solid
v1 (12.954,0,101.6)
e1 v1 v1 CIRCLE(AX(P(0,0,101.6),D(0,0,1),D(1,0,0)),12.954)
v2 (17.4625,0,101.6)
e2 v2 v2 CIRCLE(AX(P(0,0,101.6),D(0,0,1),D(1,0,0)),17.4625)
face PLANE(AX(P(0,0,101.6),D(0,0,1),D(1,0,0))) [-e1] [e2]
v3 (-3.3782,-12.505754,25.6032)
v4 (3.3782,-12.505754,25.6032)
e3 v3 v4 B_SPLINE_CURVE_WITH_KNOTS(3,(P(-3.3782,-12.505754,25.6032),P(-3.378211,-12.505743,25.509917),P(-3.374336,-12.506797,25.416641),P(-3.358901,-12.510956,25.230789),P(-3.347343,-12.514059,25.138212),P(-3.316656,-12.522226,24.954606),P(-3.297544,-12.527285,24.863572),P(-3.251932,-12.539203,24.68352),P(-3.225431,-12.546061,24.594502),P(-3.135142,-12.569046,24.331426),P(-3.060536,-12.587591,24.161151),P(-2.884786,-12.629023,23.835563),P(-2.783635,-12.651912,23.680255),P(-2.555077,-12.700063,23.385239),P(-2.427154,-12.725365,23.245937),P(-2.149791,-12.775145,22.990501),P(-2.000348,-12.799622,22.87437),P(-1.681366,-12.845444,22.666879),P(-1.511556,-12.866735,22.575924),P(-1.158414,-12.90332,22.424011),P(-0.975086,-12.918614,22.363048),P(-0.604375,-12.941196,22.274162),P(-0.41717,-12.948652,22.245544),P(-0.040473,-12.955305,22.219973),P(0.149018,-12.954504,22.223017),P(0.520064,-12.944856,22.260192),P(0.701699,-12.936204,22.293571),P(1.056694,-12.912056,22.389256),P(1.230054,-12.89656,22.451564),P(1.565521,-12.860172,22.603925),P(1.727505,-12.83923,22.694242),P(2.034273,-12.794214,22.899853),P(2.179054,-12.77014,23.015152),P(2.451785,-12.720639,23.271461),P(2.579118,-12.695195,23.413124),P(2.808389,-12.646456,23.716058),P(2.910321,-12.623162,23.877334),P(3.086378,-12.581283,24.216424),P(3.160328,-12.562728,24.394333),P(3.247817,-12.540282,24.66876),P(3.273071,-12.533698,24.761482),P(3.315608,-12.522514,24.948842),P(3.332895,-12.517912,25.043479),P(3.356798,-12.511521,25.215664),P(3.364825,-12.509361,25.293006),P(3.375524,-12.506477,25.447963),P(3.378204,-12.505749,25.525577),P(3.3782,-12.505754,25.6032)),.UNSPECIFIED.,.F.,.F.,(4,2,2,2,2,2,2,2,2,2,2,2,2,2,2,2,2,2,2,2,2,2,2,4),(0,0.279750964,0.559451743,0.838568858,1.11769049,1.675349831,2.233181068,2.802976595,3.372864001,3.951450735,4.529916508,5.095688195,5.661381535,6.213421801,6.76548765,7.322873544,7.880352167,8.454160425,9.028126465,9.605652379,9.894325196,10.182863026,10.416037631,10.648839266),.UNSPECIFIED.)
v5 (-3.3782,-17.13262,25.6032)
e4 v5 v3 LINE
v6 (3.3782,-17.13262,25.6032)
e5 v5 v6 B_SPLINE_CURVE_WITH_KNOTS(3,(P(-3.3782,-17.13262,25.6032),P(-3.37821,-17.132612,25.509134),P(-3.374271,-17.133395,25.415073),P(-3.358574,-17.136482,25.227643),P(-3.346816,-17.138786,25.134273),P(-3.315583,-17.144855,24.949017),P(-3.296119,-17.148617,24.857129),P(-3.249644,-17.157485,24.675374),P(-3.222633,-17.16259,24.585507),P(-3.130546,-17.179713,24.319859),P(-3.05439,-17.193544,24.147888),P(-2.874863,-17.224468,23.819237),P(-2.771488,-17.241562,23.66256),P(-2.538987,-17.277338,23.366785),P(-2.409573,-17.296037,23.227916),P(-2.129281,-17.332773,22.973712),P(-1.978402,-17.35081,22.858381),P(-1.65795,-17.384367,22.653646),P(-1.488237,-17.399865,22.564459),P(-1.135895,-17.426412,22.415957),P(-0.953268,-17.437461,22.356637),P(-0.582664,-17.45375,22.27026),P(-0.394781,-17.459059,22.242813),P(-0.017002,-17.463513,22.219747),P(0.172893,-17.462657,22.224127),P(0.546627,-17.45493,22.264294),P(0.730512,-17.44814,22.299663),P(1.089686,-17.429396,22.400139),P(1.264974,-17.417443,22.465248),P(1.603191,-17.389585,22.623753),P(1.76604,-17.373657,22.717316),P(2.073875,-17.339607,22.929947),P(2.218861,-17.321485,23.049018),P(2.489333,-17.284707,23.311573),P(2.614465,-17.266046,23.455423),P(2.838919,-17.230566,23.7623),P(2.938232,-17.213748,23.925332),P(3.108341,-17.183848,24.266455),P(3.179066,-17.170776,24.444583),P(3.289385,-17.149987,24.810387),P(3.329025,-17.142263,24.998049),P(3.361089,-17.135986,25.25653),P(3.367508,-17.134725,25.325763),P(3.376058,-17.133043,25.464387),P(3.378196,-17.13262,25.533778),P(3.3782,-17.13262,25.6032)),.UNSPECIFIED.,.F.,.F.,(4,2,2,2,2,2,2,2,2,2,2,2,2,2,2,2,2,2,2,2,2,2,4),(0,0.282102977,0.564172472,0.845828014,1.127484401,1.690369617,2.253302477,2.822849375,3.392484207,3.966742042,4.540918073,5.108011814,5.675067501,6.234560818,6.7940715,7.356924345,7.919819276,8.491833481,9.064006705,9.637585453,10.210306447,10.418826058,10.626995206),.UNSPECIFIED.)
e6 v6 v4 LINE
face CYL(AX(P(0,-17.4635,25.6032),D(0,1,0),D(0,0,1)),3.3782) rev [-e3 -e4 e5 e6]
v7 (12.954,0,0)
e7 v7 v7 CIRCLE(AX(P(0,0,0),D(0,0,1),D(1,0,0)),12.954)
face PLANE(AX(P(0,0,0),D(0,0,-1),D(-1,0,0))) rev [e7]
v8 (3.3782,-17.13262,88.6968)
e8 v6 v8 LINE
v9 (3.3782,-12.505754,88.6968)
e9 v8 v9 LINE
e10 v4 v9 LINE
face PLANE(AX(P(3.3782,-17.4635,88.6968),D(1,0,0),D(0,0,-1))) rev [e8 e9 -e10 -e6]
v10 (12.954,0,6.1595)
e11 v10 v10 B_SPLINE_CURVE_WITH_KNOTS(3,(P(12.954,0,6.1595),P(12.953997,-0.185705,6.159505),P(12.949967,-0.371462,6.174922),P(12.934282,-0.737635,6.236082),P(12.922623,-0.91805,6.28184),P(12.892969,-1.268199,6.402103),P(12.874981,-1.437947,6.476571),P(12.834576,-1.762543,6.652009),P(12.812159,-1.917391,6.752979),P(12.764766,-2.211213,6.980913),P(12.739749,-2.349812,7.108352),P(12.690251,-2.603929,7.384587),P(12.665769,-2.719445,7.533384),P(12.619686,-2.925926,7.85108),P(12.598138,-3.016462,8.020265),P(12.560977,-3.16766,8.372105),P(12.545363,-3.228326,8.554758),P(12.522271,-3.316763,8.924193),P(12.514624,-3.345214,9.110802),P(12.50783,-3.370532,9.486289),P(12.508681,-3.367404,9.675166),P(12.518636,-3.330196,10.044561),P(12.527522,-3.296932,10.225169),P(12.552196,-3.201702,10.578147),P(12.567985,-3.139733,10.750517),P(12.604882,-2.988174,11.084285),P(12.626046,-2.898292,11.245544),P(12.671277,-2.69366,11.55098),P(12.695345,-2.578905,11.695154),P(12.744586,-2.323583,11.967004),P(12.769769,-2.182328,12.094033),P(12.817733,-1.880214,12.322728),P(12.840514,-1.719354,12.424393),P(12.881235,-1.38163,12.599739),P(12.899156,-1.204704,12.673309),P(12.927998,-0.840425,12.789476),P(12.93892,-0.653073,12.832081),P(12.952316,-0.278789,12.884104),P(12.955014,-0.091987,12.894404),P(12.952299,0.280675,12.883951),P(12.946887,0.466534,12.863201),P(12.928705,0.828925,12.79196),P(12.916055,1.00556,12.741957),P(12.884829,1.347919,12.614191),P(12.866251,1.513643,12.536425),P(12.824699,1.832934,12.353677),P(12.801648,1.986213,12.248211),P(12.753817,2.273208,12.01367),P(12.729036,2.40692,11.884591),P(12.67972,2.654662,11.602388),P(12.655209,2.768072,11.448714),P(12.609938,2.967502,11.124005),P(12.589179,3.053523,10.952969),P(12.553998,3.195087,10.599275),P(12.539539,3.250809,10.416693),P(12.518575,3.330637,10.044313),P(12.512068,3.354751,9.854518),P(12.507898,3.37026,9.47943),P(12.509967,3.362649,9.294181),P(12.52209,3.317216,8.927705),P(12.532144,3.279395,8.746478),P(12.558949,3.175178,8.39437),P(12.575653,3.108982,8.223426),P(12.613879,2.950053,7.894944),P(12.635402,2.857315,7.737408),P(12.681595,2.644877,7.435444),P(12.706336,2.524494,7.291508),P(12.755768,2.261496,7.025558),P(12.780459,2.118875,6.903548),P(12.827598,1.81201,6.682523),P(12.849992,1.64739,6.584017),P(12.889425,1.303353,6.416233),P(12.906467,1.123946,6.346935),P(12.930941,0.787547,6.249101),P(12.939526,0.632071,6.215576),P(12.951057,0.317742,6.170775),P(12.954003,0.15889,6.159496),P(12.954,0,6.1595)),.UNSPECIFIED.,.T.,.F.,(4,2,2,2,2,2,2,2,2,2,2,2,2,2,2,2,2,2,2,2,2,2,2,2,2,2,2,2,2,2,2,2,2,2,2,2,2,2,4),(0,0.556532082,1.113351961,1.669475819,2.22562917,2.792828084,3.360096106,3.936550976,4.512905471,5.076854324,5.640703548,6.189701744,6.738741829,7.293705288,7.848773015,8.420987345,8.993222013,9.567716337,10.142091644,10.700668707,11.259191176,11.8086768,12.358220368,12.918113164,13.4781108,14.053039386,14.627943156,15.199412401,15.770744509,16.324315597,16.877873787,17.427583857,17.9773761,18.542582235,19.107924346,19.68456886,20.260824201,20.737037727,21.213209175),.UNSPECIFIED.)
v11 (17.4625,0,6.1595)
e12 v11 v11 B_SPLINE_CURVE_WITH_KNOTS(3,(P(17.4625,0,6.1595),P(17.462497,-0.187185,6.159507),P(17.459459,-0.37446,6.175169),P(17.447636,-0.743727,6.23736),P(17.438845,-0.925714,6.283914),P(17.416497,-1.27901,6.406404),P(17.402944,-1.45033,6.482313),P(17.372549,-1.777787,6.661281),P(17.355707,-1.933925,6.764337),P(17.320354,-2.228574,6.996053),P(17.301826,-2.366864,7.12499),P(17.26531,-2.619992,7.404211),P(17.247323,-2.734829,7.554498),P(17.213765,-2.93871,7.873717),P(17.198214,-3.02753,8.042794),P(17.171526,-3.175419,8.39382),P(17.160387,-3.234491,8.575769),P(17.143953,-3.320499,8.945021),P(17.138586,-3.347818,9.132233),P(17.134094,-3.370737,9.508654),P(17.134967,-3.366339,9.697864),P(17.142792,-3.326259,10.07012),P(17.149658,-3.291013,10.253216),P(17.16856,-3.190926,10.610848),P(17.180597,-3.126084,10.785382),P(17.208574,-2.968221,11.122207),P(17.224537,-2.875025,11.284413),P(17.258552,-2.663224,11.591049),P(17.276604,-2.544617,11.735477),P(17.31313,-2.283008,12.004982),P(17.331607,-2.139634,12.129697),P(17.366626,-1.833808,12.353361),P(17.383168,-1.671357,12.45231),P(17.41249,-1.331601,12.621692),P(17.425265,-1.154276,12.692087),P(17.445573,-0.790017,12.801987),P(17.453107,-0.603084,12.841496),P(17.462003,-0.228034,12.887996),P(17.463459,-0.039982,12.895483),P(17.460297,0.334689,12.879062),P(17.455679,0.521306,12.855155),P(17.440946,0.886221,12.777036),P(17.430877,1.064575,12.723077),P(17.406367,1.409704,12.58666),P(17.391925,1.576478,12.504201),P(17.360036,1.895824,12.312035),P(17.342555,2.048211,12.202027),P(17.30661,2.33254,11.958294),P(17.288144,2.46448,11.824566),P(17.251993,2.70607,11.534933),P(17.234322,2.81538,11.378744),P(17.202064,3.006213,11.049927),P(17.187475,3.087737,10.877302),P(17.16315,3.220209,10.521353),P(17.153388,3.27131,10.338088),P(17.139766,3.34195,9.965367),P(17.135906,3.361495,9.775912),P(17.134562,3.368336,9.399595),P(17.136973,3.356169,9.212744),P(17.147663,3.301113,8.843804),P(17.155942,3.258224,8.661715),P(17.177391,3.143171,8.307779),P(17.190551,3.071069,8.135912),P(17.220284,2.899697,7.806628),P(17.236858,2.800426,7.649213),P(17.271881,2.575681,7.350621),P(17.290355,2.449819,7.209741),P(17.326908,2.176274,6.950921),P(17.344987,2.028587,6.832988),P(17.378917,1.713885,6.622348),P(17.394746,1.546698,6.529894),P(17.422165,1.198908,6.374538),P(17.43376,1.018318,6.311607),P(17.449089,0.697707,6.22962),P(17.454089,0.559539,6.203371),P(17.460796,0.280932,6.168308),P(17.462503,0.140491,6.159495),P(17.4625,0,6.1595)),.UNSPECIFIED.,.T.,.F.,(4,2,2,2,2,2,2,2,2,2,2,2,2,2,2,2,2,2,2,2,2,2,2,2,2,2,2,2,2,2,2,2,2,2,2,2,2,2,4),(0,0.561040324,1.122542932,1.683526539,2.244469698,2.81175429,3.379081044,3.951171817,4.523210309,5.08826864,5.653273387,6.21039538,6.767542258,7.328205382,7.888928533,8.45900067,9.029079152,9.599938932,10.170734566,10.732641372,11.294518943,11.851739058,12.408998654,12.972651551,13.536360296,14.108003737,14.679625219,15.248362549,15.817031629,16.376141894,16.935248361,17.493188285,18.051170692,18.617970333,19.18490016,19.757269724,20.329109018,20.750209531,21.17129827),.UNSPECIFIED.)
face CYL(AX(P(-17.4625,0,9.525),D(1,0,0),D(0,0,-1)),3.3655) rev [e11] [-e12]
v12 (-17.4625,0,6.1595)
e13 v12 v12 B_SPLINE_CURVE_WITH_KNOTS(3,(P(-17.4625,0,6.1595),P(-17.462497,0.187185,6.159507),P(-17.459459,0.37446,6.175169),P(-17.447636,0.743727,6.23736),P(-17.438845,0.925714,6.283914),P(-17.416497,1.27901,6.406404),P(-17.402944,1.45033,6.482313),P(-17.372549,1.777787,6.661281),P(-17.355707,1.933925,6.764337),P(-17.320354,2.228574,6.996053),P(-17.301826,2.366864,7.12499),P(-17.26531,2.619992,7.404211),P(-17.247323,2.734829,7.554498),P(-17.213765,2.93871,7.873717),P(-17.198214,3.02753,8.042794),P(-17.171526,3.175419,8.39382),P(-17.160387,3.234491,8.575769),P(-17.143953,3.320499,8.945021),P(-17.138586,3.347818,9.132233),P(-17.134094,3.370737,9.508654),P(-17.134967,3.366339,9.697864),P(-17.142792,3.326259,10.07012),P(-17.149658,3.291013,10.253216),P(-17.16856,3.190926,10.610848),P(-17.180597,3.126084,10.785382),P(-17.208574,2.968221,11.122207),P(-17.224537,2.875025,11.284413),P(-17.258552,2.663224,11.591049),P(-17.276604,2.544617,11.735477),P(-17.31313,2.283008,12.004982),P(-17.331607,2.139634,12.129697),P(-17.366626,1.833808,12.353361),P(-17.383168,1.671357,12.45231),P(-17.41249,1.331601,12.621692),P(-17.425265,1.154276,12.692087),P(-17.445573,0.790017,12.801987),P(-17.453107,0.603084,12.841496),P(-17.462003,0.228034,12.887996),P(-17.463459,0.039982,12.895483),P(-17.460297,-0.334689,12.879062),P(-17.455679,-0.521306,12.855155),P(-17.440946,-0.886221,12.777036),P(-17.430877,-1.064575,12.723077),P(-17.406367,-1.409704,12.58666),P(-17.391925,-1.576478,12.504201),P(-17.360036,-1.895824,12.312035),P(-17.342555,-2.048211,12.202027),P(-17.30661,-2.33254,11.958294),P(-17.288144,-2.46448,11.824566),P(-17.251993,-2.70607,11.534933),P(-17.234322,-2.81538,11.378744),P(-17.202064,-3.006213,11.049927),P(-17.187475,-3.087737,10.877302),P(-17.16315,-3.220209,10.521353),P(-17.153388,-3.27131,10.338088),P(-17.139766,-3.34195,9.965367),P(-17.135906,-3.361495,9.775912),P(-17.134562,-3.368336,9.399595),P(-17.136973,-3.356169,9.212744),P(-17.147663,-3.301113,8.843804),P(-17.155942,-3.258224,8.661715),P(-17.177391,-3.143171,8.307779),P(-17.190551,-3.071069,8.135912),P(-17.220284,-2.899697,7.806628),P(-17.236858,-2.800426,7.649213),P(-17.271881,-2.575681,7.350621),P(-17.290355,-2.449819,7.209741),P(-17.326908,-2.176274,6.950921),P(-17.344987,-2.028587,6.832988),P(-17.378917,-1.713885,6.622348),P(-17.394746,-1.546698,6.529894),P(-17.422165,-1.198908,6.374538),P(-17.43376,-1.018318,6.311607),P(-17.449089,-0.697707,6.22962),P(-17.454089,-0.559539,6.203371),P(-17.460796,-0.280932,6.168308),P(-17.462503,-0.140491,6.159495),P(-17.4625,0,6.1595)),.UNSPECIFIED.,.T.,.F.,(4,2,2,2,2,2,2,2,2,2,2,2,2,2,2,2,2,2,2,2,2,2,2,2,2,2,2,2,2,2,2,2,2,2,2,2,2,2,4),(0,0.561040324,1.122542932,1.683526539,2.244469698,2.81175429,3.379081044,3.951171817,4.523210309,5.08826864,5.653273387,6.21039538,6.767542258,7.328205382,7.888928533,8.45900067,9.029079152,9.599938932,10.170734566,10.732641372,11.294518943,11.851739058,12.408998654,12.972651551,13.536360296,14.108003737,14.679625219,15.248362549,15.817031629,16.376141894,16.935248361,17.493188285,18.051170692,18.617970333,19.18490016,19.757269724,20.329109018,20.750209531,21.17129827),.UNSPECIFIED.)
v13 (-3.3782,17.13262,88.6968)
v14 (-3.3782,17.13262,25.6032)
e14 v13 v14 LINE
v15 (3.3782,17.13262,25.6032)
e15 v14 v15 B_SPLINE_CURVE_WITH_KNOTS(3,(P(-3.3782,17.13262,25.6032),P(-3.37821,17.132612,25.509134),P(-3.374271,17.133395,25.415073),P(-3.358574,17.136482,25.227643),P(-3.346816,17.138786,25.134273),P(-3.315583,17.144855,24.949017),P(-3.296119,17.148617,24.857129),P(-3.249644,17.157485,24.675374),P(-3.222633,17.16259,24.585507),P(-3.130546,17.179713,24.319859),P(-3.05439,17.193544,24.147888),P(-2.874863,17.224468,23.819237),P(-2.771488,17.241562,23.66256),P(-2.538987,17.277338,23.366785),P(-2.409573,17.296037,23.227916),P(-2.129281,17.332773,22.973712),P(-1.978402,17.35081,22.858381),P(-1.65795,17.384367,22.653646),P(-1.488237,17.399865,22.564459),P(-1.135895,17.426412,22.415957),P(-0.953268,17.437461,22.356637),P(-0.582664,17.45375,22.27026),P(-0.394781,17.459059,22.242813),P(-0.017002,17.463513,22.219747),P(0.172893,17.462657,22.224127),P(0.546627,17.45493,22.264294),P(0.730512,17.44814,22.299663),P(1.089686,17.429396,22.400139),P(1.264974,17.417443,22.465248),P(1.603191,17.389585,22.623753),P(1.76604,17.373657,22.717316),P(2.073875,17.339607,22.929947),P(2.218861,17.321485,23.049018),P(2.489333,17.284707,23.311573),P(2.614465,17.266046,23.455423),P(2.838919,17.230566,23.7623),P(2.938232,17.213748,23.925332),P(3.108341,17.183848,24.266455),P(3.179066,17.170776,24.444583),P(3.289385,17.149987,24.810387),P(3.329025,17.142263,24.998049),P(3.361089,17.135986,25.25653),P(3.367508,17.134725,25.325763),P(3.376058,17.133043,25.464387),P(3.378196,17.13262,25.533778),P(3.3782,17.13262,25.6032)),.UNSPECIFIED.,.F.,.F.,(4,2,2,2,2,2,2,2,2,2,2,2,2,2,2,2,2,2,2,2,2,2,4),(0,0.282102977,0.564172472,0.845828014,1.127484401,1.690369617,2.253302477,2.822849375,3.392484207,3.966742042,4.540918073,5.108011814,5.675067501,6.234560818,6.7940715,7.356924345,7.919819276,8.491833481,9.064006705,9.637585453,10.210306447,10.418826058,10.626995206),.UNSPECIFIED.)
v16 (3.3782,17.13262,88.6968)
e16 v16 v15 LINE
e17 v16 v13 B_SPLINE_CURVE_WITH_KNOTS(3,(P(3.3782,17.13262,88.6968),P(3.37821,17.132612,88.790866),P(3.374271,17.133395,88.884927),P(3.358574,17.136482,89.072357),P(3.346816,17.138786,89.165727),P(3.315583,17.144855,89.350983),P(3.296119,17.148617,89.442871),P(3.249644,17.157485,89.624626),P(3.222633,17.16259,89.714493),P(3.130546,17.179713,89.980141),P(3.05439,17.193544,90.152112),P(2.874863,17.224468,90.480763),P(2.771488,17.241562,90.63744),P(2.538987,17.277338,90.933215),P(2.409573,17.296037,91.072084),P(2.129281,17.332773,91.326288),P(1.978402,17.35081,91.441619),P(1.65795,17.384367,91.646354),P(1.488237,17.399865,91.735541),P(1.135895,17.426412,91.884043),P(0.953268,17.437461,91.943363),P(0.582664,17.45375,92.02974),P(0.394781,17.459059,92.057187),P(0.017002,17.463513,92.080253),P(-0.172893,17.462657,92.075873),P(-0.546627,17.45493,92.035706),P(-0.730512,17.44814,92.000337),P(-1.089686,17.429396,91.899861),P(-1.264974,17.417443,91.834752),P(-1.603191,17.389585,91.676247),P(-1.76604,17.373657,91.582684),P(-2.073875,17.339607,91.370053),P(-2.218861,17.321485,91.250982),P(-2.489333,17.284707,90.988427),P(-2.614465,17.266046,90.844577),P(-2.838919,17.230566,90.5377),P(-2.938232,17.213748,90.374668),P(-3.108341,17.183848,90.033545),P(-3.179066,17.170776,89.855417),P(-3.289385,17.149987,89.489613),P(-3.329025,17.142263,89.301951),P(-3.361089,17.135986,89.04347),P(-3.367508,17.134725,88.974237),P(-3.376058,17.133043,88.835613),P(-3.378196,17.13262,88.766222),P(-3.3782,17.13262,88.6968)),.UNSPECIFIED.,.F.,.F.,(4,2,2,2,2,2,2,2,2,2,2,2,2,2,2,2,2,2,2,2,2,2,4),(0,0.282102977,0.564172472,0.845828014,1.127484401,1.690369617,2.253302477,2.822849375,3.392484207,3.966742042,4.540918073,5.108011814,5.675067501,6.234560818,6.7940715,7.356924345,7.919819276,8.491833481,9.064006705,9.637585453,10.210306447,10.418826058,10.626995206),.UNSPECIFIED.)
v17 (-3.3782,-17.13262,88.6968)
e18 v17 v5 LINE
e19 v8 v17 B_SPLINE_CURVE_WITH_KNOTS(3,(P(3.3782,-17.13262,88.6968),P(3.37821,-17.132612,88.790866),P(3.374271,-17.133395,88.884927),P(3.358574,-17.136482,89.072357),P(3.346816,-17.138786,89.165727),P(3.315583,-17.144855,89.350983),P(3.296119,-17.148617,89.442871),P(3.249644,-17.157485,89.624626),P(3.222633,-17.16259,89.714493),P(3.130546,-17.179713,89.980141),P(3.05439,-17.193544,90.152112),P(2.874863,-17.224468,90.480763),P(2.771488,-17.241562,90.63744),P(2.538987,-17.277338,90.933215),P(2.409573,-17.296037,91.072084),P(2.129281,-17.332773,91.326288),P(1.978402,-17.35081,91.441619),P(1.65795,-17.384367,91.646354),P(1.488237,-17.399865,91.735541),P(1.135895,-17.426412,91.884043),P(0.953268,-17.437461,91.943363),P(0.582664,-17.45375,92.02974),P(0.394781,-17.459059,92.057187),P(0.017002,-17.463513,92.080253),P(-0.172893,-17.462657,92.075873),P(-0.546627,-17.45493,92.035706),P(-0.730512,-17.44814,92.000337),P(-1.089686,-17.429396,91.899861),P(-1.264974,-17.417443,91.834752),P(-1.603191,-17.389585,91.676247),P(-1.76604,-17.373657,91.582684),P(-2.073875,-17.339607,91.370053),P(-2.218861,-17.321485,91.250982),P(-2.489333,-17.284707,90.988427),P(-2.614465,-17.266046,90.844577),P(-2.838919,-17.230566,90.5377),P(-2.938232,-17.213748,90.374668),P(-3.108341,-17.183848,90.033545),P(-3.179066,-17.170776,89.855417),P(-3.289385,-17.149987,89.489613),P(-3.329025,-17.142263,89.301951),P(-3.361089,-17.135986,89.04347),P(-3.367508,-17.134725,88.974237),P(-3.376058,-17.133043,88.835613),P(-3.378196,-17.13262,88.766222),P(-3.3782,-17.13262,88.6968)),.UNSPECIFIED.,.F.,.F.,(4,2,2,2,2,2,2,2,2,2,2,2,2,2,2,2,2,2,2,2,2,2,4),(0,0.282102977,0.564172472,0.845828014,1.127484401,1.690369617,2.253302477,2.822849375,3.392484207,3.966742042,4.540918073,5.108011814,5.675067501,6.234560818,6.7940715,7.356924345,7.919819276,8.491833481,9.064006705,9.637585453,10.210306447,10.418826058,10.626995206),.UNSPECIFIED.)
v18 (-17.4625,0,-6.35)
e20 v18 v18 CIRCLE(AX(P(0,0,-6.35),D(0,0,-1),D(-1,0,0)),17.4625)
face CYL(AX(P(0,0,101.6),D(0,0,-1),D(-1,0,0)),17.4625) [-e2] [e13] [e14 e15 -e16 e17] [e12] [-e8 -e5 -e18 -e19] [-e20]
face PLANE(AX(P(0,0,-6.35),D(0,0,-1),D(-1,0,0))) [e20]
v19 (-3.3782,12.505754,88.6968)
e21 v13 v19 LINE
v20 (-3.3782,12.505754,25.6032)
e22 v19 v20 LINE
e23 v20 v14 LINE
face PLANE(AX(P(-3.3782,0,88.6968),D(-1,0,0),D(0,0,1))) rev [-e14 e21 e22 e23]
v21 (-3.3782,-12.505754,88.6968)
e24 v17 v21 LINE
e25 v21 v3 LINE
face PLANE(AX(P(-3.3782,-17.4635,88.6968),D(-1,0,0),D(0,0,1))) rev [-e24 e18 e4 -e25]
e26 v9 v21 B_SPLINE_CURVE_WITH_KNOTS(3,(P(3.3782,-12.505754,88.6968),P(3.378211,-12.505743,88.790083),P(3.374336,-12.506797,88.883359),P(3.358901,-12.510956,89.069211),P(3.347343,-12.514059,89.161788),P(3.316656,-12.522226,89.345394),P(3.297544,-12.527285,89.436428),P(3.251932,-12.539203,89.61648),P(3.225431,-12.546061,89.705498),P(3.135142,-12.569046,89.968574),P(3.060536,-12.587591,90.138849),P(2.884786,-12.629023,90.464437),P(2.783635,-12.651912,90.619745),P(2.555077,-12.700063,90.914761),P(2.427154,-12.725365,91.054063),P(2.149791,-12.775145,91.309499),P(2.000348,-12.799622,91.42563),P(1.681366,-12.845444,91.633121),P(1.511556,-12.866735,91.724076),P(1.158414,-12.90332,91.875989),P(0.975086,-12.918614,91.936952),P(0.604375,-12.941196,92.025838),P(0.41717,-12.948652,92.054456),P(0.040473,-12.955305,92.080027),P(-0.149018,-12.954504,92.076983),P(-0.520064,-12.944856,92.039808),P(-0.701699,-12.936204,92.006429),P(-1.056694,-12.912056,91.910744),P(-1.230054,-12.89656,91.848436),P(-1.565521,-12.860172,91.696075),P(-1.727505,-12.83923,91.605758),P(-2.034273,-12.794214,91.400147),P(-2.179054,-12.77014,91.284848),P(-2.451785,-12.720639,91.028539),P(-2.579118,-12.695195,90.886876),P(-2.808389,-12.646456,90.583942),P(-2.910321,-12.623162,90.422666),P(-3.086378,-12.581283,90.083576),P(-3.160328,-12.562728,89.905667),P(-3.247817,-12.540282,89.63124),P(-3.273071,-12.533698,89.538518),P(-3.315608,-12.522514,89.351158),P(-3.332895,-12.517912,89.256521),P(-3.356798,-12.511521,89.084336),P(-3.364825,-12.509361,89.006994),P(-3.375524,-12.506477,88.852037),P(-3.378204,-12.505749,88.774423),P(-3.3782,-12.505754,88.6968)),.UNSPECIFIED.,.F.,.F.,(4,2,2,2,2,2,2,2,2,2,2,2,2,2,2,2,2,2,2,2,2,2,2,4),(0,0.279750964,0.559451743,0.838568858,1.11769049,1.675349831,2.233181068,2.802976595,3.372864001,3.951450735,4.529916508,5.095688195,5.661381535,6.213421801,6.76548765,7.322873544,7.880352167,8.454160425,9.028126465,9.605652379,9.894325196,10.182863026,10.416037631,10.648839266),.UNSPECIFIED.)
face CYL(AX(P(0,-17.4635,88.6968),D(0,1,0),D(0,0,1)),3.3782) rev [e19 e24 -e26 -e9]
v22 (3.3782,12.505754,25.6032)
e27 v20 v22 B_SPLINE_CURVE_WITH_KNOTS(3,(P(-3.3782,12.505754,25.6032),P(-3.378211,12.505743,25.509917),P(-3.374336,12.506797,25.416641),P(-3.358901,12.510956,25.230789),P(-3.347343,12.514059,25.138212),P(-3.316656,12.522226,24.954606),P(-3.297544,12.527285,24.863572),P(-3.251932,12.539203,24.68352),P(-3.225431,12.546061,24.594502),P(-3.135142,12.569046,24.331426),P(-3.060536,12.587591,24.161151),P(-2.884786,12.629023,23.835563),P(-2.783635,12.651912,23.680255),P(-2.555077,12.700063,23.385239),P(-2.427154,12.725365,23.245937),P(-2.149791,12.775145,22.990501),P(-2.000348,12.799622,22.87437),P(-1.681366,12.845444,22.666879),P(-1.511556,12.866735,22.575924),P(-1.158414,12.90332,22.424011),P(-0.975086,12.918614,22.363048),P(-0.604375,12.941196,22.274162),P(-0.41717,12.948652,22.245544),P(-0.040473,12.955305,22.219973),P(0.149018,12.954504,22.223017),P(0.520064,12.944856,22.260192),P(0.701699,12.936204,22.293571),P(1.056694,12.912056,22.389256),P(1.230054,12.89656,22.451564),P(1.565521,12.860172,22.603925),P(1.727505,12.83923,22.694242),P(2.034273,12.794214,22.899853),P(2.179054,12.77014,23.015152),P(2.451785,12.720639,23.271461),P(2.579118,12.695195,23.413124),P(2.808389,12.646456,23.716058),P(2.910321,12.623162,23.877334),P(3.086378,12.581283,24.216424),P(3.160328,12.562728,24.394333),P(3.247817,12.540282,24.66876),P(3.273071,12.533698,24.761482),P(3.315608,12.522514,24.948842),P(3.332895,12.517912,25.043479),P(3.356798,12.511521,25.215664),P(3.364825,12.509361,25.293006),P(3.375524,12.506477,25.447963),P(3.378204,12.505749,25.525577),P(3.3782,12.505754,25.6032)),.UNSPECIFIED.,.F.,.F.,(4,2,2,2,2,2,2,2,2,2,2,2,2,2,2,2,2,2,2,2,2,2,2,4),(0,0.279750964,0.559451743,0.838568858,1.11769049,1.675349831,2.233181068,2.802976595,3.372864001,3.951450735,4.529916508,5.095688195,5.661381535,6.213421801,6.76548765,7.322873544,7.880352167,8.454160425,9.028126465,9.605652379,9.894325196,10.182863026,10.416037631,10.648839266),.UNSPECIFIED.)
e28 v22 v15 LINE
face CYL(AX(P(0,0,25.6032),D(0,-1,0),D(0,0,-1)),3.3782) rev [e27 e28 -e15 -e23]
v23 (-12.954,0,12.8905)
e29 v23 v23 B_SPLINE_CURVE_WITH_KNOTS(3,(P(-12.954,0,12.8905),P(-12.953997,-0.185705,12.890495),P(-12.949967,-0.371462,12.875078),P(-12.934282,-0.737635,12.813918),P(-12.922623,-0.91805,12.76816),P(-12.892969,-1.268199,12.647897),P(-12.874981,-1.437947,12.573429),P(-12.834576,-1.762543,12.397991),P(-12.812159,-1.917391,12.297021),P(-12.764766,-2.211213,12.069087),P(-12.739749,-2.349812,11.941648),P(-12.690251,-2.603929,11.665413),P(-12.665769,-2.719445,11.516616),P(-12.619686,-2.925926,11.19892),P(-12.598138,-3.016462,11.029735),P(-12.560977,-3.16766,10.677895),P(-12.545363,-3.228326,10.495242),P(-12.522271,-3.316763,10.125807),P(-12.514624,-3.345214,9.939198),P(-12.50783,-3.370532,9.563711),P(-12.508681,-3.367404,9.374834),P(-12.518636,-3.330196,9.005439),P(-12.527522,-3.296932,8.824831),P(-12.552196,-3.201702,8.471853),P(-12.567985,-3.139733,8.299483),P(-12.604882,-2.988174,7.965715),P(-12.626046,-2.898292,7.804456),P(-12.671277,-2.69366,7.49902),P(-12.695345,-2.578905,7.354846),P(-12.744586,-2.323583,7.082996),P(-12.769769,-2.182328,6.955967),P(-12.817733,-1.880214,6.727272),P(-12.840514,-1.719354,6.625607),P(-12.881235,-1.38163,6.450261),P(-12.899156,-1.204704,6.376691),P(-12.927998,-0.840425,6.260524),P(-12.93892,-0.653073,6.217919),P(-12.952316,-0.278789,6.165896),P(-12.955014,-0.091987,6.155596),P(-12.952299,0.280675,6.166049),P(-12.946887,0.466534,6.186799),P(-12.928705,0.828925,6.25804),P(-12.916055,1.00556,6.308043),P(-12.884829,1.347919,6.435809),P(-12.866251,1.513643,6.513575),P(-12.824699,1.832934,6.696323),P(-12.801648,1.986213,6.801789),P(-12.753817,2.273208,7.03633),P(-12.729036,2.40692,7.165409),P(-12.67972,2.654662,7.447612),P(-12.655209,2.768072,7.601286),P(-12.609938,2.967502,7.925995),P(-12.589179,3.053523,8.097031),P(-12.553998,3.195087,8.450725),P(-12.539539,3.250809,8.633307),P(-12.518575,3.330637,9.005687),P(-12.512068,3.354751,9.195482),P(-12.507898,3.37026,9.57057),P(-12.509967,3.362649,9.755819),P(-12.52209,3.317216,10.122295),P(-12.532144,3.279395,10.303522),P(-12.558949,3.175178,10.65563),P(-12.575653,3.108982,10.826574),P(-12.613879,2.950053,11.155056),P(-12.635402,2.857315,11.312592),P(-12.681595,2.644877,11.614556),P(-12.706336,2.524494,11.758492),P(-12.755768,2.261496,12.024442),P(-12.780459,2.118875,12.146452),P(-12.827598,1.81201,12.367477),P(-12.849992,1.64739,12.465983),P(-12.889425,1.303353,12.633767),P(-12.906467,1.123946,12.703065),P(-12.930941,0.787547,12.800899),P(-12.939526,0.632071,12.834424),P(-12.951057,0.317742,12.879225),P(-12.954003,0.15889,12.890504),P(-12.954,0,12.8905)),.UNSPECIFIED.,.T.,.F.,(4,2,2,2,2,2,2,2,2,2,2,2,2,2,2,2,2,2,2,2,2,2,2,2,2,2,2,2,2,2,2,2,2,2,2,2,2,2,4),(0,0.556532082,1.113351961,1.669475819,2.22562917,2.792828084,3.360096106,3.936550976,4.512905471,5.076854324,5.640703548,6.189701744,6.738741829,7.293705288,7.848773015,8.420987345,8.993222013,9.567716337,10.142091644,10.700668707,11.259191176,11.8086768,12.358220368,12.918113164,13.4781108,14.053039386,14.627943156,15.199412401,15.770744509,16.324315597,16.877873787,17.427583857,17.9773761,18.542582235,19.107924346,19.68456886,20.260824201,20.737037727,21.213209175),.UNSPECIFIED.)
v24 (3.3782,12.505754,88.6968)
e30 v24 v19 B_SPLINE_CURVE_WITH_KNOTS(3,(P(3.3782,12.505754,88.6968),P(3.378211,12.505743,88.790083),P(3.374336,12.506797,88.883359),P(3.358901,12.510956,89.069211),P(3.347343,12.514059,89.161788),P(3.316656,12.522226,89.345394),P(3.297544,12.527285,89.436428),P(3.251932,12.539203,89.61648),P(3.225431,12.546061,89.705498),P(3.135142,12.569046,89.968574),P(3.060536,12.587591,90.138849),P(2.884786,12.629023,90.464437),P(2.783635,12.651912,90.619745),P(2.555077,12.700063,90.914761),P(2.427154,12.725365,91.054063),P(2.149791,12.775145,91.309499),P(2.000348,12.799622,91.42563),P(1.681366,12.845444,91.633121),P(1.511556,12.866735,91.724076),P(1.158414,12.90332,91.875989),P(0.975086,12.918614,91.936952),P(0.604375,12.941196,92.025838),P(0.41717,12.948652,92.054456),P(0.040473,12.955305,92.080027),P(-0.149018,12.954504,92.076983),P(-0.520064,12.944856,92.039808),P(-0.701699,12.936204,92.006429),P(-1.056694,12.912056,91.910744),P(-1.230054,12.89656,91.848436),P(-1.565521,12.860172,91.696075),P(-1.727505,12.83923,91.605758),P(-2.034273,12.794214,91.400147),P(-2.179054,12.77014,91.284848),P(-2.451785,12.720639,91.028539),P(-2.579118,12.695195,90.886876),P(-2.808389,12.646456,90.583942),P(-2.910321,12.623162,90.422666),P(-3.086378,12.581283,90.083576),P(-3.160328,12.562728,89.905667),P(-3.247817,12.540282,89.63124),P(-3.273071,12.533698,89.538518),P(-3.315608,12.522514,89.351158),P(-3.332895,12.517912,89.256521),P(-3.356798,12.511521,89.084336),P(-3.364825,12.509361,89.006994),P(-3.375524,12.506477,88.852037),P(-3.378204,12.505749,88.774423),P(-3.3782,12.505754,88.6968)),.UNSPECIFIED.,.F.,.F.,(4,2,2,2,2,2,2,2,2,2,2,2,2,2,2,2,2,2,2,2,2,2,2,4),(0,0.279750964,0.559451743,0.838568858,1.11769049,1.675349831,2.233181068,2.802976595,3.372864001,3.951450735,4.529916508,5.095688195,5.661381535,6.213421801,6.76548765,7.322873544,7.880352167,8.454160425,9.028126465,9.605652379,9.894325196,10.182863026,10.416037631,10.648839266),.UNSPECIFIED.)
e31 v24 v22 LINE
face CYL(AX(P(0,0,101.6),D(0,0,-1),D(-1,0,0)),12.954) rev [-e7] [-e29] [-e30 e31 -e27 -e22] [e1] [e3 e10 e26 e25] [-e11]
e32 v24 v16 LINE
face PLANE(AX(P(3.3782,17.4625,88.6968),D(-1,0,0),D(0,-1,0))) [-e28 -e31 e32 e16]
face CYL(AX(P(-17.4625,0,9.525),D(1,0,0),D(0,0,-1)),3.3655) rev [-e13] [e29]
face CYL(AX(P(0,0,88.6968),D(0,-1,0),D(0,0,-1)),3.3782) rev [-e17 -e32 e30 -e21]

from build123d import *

# Parameters (mm, degrees)
SKETCH1_R                   = 17.4625
SKETCH1_R_2                 = 12.954
BOSS_EXTRUDE1_DEPTH         = 101.6
F_1_4_START                 = 12
F_1_4_CLEARANCE_SLOT1_DEPTH = 6
CUT_EXTRUDE1_REACH          = 106.558
CUT_EXTRUDE1_END_RADIUS     = 17.4625
CUT_EXTRUDE3_DEPTH          = 105.558298762
CUT_EXTRUDE3_DEPTH_BACK     = 105.558298762
SKETCH6_R                   = 3.3655
BOSS_EXTRUDE3_START         = 6.35
SKETCH8_R                   = 17.4625
BOSS_EXTRUDE3_DEPTH         = 6.35


with BuildPart() as part:
    # Sketch1 → Boss-Extrude1 (new body)
    with BuildSketch(Plane.XY):
        Circle(SKETCH1_R)
        Circle(SKETCH1_R_2, mode=Mode.SUBTRACT)
    extrude(amount=BOSS_EXTRUDE1_DEPTH)

    # 1/4 Clearance Slot1: read off the stored shape, not the designer's step
    # 1/4 Clearance Slot1 outline → 1/4 Clearance Slot1 (cut)
    with BuildSketch(Plane(origin=(0, 0, 0), x_dir=(1, 0, 0), z_dir=(0, 1, 0)).offset(F_1_4_START)):
        with BuildLine():
            Line((3.3782, -88.6968), (3.3782, -25.6032))
            ThreePointArc((3.3782, -25.6032), (0, -22.225), (-3.3782, -25.6032))
            Line((-3.3782, -25.6032), (-3.3782, -88.6968))
            ThreePointArc((-3.3782, -88.6968), (0, -92.075), (3.3782, -88.6968))
        make_face()
    extrude(amount=F_1_4_CLEARANCE_SLOT1_DEPTH, mode=Mode.SUBTRACT)

    # Cut-Extrude1: up to this cylinder (the profile starts inside it)
    cut_extrude1_end = Plane(origin=(0, 0, 57.15), z_dir=(0, 0, -1)) * Cylinder(CUT_EXTRUDE1_END_RADIUS, 249.041, mode=Mode.PRIVATE)
    # Sketch4 → Cut-Extrude1 (cut, up to the surface)
    with BuildSketch(Plane(origin=(0, 0, 0), x_dir=(1, 0, 0), z_dir=(0, 1, 0)), mode=Mode.PRIVATE) as cut_extrude1_sk1:
        with BuildLine():
            Line((-3.3782, -88.6968), (-3.3782, -25.6032))
            ThreePointArc((-3.3782, -25.6032), (0, -22.225), (3.3782, -25.6032))
            Line((3.3782, -25.6032), (3.3782, -88.6968))
            ThreePointArc((3.3782, -88.6968), (0, -92.075), (-3.3782, -88.6968))
        make_face()
    cut_extrude1_tool1 = extrude(cut_extrude1_sk1.sketch, amount=-CUT_EXTRUDE1_REACH, mode=Mode.PRIVATE) & cut_extrude1_end
    add(cut_extrude1_tool1.solids().sort_by_distance((0, 0, 57.15))[0], mode=Mode.SUBTRACT)

    # Sketch6 → Cut-Extrude3 (cut, two sides: drawn at the far end of the back side and taken through both)
    with BuildSketch(Plane(origin=(0, 0, 0), x_dir=(0, 0, -1), z_dir=(1, 0, 0)).offset(-CUT_EXTRUDE3_DEPTH_BACK)):
        with Locations((-9.525, 0)):
            Circle(SKETCH6_R)
    extrude(amount=CUT_EXTRUDE3_DEPTH + CUT_EXTRUDE3_DEPTH_BACK, mode=Mode.SUBTRACT)

    # Sketch8 → Boss-Extrude3 (add)
    with BuildSketch(Plane(origin=(0, 0, 0), x_dir=(-1, 0, 0), z_dir=(0, 0, -1)).offset(BOSS_EXTRUDE3_START)):
        Circle(SKETCH8_R)
    extrude(amount=-BOSS_EXTRUDE3_DEPTH)


solid = part.part
